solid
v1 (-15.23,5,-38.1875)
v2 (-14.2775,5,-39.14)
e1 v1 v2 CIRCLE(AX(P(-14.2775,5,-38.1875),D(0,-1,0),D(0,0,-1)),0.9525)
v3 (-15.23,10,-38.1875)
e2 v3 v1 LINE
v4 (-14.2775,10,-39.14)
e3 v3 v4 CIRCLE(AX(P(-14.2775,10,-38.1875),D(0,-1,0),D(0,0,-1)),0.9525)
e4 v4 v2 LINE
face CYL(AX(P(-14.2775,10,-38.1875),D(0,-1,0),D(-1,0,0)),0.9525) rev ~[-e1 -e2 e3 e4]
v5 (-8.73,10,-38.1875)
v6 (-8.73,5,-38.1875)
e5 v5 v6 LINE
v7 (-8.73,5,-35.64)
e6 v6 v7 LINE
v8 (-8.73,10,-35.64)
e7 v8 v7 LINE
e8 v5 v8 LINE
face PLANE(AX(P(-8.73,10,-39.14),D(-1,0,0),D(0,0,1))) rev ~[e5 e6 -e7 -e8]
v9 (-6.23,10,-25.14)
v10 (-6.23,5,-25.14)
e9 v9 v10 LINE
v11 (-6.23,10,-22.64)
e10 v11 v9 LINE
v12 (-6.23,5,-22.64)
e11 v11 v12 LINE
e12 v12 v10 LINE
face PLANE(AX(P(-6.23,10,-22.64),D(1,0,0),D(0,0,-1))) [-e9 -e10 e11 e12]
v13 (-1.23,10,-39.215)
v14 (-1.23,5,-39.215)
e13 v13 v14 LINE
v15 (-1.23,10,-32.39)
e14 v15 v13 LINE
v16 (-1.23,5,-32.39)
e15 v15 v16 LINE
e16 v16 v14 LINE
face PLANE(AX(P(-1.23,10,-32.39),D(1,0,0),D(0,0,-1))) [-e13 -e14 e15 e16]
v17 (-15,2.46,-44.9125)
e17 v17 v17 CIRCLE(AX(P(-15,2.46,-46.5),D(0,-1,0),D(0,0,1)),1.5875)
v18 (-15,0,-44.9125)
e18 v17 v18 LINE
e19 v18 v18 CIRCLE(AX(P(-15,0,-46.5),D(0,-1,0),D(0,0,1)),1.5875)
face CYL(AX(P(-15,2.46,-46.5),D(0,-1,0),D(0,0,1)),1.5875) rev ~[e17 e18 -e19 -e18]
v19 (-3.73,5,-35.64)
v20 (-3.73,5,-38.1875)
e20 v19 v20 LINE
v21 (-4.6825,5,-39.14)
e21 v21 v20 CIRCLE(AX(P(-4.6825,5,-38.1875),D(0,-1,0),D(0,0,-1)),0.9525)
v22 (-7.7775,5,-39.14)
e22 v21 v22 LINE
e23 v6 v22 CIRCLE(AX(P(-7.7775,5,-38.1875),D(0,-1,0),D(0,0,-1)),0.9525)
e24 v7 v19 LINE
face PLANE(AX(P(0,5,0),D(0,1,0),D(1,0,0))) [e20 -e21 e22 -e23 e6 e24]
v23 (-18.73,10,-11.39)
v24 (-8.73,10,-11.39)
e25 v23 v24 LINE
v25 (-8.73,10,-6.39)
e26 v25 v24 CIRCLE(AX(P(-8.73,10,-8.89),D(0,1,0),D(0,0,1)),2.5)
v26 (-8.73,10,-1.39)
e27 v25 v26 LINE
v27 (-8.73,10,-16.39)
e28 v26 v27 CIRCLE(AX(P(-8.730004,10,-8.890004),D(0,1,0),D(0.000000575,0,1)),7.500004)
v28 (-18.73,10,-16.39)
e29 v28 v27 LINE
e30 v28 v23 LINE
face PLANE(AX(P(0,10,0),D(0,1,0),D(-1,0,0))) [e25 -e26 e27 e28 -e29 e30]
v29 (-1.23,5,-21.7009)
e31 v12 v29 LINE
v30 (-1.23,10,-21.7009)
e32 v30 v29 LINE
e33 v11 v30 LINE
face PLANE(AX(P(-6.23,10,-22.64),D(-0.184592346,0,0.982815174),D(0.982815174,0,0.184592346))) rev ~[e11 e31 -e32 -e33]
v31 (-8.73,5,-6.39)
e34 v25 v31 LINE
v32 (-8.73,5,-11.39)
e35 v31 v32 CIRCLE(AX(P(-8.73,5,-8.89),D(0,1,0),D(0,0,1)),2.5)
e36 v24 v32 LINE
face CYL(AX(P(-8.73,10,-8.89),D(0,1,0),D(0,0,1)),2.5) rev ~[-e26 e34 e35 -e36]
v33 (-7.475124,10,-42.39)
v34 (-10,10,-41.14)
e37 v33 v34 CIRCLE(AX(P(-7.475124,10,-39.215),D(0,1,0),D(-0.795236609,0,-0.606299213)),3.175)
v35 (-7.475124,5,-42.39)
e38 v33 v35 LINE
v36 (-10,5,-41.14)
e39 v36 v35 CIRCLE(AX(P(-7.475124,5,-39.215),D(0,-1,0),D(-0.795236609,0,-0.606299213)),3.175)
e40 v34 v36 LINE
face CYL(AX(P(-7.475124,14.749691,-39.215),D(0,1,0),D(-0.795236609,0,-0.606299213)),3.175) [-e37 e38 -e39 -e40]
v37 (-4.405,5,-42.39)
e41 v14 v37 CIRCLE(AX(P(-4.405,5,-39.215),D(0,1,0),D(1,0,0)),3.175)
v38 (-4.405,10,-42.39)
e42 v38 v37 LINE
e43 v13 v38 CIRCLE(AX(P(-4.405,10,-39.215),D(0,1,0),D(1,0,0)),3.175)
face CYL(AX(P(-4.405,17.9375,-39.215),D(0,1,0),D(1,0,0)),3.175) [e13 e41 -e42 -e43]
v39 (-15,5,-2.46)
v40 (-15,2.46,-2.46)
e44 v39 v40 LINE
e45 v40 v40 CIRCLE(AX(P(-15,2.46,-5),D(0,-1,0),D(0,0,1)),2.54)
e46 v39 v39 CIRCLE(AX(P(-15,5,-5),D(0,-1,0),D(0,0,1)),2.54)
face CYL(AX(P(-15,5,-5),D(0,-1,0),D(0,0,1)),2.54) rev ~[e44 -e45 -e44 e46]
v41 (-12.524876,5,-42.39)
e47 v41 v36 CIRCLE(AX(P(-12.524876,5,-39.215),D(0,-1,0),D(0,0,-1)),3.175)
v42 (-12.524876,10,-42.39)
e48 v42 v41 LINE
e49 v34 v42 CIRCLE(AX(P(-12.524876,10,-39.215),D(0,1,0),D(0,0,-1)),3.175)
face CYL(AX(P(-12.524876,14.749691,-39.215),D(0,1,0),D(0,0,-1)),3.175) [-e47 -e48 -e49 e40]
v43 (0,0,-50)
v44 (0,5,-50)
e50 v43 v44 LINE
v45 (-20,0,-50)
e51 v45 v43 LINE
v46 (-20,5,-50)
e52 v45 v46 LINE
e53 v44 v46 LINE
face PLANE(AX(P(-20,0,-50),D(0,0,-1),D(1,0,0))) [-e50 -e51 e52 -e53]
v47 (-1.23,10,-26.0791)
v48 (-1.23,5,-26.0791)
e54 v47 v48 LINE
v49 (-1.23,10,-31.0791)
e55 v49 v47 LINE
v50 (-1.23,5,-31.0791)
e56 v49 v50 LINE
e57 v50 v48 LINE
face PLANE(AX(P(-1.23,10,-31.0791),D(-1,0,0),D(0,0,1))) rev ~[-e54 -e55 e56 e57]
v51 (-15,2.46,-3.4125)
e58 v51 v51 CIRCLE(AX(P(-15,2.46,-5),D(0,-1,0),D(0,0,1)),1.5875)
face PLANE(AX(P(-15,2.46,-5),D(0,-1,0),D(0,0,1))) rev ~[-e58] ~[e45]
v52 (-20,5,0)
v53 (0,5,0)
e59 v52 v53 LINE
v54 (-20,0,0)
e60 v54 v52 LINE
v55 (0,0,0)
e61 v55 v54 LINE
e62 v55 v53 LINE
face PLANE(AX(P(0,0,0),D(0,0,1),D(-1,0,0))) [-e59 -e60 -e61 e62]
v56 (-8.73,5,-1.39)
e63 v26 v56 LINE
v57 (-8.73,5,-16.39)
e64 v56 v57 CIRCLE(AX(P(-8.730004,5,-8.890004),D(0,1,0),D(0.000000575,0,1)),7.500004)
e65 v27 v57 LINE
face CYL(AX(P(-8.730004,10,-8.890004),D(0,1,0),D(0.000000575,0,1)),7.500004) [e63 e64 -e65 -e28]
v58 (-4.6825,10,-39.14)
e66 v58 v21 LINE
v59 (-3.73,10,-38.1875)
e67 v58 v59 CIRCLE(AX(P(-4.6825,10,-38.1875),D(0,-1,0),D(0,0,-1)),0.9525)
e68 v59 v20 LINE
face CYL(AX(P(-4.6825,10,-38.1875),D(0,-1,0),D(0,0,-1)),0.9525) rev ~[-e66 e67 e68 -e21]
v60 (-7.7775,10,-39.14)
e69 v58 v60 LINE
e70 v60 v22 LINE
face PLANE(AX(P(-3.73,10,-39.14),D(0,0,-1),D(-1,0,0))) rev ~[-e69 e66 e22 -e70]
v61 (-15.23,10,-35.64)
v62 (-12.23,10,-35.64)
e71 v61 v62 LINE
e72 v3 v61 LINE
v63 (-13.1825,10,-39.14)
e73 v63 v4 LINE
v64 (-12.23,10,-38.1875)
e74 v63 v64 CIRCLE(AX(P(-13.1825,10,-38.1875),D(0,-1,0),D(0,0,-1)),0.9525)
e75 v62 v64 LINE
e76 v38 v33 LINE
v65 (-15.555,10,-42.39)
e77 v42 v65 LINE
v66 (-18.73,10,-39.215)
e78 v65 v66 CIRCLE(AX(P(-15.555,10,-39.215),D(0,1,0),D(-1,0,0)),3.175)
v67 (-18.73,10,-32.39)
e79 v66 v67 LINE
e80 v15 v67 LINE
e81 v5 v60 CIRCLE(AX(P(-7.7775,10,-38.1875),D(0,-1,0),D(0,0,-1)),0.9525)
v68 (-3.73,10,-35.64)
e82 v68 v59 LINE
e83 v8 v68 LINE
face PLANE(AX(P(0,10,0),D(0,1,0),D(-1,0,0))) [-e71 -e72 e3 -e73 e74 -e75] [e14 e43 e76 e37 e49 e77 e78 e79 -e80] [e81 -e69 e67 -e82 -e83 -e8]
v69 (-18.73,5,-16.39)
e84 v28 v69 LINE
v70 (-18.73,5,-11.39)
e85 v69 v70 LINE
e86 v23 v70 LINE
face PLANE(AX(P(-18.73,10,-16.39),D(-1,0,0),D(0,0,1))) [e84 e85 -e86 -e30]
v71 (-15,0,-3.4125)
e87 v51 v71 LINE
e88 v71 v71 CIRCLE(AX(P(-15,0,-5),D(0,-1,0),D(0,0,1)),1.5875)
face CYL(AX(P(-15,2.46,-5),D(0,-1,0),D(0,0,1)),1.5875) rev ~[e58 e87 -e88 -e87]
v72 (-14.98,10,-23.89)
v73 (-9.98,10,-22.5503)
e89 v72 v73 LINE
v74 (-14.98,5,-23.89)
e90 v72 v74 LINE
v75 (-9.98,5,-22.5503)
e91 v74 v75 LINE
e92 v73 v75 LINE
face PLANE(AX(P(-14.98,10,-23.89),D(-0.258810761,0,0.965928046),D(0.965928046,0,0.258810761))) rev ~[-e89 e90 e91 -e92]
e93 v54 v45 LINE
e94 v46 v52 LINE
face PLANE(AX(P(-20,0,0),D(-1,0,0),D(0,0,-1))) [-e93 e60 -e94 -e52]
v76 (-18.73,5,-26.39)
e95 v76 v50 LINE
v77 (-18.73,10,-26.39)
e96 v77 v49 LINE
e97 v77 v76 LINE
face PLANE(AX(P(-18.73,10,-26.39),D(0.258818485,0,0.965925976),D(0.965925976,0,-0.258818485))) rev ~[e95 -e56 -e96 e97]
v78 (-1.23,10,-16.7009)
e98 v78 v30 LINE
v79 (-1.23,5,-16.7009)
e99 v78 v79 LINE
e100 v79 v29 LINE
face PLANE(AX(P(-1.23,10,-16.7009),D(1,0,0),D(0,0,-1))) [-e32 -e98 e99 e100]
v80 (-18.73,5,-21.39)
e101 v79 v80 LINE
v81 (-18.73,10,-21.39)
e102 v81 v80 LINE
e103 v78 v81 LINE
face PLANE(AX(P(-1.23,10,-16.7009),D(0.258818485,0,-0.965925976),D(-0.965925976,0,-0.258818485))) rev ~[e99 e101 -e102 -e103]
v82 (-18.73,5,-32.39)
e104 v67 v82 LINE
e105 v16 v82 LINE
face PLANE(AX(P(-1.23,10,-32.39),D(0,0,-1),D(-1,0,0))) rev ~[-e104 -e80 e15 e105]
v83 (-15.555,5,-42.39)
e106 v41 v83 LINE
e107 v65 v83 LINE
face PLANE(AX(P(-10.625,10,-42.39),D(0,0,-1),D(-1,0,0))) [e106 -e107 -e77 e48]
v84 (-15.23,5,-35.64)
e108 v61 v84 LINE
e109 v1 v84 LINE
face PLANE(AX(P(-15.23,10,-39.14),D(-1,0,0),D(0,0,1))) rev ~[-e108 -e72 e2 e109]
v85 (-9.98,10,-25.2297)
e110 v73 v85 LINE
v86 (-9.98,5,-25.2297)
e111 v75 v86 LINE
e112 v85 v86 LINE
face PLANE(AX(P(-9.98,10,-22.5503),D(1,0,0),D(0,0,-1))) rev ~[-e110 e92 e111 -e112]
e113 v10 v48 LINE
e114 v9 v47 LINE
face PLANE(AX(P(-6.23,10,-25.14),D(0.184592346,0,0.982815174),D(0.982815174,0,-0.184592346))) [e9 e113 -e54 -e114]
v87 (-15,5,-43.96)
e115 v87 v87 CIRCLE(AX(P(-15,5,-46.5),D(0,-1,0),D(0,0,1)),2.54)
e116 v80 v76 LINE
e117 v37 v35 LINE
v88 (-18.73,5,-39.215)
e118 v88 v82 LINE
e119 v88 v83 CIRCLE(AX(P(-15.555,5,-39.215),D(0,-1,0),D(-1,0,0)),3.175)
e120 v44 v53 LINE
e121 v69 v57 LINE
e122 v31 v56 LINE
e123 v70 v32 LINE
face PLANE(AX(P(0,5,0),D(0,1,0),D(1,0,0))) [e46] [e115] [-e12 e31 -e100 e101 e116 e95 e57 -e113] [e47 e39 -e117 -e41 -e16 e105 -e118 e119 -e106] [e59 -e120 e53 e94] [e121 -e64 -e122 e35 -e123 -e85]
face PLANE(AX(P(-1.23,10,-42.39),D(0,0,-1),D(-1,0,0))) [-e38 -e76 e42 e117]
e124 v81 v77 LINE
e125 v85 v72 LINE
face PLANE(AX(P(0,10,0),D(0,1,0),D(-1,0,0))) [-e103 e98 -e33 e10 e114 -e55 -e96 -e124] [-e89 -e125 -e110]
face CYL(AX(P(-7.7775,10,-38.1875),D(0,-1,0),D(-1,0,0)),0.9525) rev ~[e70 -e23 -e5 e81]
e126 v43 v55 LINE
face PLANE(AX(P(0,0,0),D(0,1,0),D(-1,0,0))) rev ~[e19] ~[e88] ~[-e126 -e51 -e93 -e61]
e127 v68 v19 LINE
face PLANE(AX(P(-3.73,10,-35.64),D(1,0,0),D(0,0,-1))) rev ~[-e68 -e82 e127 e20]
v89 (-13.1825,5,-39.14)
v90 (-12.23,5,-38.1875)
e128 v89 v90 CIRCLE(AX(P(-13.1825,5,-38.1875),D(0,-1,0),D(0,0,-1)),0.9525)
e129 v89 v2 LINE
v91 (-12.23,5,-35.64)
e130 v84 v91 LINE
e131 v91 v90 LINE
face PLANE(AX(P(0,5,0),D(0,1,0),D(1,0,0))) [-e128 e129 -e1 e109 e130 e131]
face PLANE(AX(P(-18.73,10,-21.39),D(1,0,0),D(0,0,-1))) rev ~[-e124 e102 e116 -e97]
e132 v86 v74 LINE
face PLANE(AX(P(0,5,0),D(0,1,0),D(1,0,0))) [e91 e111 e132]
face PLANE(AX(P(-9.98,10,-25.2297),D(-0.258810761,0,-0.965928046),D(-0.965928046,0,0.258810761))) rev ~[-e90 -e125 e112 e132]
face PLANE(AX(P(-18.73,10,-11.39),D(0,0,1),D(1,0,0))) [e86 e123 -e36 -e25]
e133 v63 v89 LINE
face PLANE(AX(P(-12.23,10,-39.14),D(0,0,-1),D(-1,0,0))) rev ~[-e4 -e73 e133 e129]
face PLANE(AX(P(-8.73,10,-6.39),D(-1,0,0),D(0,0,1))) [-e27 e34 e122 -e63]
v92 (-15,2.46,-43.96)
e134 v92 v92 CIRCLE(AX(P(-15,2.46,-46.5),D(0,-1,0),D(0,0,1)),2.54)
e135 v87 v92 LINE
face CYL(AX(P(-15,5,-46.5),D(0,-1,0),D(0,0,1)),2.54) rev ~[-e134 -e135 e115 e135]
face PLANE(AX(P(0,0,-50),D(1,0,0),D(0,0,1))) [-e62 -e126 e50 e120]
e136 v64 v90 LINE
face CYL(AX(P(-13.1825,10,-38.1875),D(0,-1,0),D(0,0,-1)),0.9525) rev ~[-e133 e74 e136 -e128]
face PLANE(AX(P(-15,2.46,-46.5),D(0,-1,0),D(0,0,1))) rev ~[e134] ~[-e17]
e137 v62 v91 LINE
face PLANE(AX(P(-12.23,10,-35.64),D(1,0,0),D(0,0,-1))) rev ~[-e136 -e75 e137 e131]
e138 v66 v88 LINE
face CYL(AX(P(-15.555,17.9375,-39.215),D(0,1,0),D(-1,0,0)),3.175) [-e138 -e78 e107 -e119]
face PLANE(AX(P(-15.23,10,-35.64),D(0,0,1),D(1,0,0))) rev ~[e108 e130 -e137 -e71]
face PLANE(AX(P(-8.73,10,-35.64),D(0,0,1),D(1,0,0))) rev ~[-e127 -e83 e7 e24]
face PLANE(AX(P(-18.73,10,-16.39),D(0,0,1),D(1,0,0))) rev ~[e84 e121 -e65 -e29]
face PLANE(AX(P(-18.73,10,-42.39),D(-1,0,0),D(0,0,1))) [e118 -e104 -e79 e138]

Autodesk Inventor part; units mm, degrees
ref_plane "YZ Plane" through (0, 0, 0) normal (1, 0, 0) x (0, 1, 0)
ref_plane "XZ Plane" through (0, 0, 0) normal (0, 1, 0) x (-1, 0, 0)
ref_plane "XY Plane" through (0, 0, 0) normal (0, 0, 1) x (1, 0, 0)
sketch "Sketch1" plane through (0, 0, 0) normal (0, 1, 0) x (-1, 0, 0)
  line L0 (0, 0) -> (20, 0)
  line L1 (20, 0) -> (20, -50)
  line L2 (20, -50) -> (0, -50)
  line L3 (0, -50) -> (0, 0)
  dimension "d0" = 50
  dimension "d1" = 20
extrude "Extrusion1" add sketch "Sketch1" along normal blind 10
sketch "Sketch4" plane through (0, 10, 0) normal (0, 1, 0) x (1, 0, 0)
  line L0 (-18.73, 16.39) -> (-18.73, 11.39)
  line L1 (-18.73, 11.39) -> (-8.73, 11.39)
  line L2 (-8.73, 11.39) -> (-8.73, 6.39) construction
  line L3 (-18.73, 16.39) -> (-8.73, 16.39)
  arc A0 (-8.73, 6.39) -> (-8.73, 11.39) centre (-8.73, 8.89) ccw
  line L4 (-8.73, 6.39) -> (-8.73, 1.39)
  arc A1 (-15.8011, 11.39) -> (-8.73, 1.39) centre (-8.73, 8.89) ccw construction
  line L5 (-20, 0) -> (0, 0) construction
  line L6 (0, 0) -> (0, 50) construction
  line L7 (0, 50) -> (-20, 50) construction
  line L8 (-20, 50) -> (-20, 0) construction
  line L9 (-20, 0) -> (0, 0) projected
  line L10 (-10, 0) -> (-10, 50) construction
  arc A2 (-10, 16.2817) -> (-15.8011, 11.39) centre (-8.73, 8.89) ccw construction
  arc A3 (-8.73, 1.39) -> (-10, 16.2817) centre (-8.73, 8.89) ccw
  arc A4 (-10, 6.7366) -> (-8.73, 6.39) centre (-8.73, 8.89) ccw construction
  arc A5 (-8.73, 11.39) -> (-10, 6.7366) centre (-8.73, 8.89) ccw construction
  line L11 (-1.23, 8.89) -> (-1.23, 50) construction
  line L12 (-1.23, 16.7009) -> (-18.73, 21.39)
  line L13 (-18.73, 21.39) -> (-18.73, 26.39)
  line L14 (-18.73, 26.39) -> (-1.23, 31.0791)
  line L15 (-1.23, 32.39) -> (-18.73, 32.39)
  line L16 (-1.23, 16.7009) -> (-1.23, 21.7009)
  line L17 (-6.23, 22.64) -> (-1.23, 21.7009)
  line L18 (-6.23, 22.64) -> (-6.23, 25.14)
  line L19 (-6.23, 25.14) -> (-1.23, 26.0791)
  line L20 (-1.23, 31.0791) -> (-1.23, 26.0791)
  line L21 (-18.73, 23.89) -> (-1.23, 23.89) construction
  line L22 (-14.98, 23.89) -> (-9.98, 22.5503)
  line L23 (-9.98, 22.5503) -> (-9.98, 25.2297)
  line L24 (-9.98, 25.2297) -> (-14.98, 23.89)
  line L25 (-1.23, 32.39) -> (-1.23, 42.39)
  line L26 (-1.23, 42.39) -> (-9.375, 42.39)
  line L27 (-10, 42.39) -> (-10, 42.39)
  line L28 (-10, 42.39) -> (-10.625, 42.39)
  line L29 (-18.73, 42.39) -> (-18.73, 32.39)
  line L30 (-8.73, 35.64) -> (-3.73, 35.64)
  line L31 (-3.73, 35.64) -> (-3.73, 39.14)
  line L32 (-3.73, 39.14) -> (-8.73, 39.14)
  line L33 (-8.73, 39.14) -> (-8.73, 35.64)
  line L34 (-6.23, 32.39) -> (-6.23, 42.39) construction
  line L35 (-6.23, 37.39) -> (-1.23, 37.39) construction
  line L36 (-6.23, 37.39) -> (-10, 37.39) construction
  line L37 (-15.23, 35.64) -> (-12.23, 35.64)
  line L38 (-12.23, 35.64) -> (-12.23, 39.14)
  line L39 (-12.23, 39.14) -> (-15.23, 39.14)
  line L40 (-15.23, 39.14) -> (-15.23, 35.64)
  line L41 (-12.23, 37.39) -> (-10, 37.39) construction
  line L42 (-20, 50) -> (-20, 0) projected
  line L43 (-20, 0) -> (-20, 50)
  line L44 (0, 50) -> (-20, 50) projected
  line L45 (-20, 50) -> (0, 50)
  line L46 (0, 50) -> (0, 0)
  line L47 (-10.625, 42.39) -> (-10, 41.14)
  line L48 (-10, 41.14) -> (-9.375, 42.39)
  line L49 (-10, 42.39) -> (-10.625, 42.39)
  line L50 (-10, 42.39) -> (-9.375, 42.39)
  line L51 (-10.625, 42.39) -> (-18.73, 42.39)
  line L52 (-9.375, 42.39) -> (-10, 42.39)
  point P0 (-6.23, 23.89)
  point P1 (-9.98, 23.89)
  point P2 (-6.23, 39.14)
  point P3 (-8.73, 37.39)
  dimension "d11" = 5
  dimension "d12" = 10
  dimension "d14" = 5
  dimension "d16" = 10
  dimension "d17" = 1.27
  dimension "d18" = 8.89
  dimension "d19" = 75
  dimension "d20" = 75
  dimension "d21" = 5
  dimension "d22" = 2.5
  dimension "d23" = 15
  dimension "d24" = 5
  dimension "d25" = 5
  dimension "d26" = 8.5
  dimension "d27" = 10
  dimension "d28" = 10
  dimension "d29" = 5
  dimension "d34" = 3.5
  dimension "d35" = 1.25
  dimension "d36" = 1.25
  dimension "d39" = 2.5
  dimension "d40" = 3.5
  dimension "d41" = 3.5
extrude "Extrusion3" cut sketch "Sketch4" against normal blind 5 contours L42 L44 L46 L9 | L48 L47 L28 L50 | L24 L23 L22 | L33 L32 L31 L30 | L40 L39 L38 L37
fillet "Fillet1" radius 3.175 4 edges at (-18.73, 7.5, -42.39) (-10.625, 7.5, -42.39) (-9.375, 7.5, -42.39) (-1.23, 7.5, -42.39)
sketch "Sketch5" plane through (0, 5, 0) normal (0, 1, 0) x (1, 0, 0)
  line L0 (-20, 50) -> (0, 50) projected
  line L1 (-20, 0) -> (-20, 50) projected
  line L2 (0, 0) -> (-20, 0) projected
  point P0 (-15, 5)
  point P1 (-15, 46.5)
  dimension "d43" = 3.5
  dimension "d44" = 5
  dimension "d45" = 5
  dimension "d46" = 5
hole "Hole1" at (-15, 5, -5) at (-15, 5, -46.5) direction (0, -1, 0) diameter 3.175 end through all counterbore diameter 5.08 counterbore depth 2.54
fillet "Fillet2" radius 0.9525 4 edges at (-8.73, 7.5, -39.14) (-3.73, 7.5, -39.14) (-12.23, 7.5, -39.14) (-15.23, 7.5, -39.14)
equation "\"d20\" = d19"
equation "\"d22\" = 0.5 * d21"
properties part number "initials"
